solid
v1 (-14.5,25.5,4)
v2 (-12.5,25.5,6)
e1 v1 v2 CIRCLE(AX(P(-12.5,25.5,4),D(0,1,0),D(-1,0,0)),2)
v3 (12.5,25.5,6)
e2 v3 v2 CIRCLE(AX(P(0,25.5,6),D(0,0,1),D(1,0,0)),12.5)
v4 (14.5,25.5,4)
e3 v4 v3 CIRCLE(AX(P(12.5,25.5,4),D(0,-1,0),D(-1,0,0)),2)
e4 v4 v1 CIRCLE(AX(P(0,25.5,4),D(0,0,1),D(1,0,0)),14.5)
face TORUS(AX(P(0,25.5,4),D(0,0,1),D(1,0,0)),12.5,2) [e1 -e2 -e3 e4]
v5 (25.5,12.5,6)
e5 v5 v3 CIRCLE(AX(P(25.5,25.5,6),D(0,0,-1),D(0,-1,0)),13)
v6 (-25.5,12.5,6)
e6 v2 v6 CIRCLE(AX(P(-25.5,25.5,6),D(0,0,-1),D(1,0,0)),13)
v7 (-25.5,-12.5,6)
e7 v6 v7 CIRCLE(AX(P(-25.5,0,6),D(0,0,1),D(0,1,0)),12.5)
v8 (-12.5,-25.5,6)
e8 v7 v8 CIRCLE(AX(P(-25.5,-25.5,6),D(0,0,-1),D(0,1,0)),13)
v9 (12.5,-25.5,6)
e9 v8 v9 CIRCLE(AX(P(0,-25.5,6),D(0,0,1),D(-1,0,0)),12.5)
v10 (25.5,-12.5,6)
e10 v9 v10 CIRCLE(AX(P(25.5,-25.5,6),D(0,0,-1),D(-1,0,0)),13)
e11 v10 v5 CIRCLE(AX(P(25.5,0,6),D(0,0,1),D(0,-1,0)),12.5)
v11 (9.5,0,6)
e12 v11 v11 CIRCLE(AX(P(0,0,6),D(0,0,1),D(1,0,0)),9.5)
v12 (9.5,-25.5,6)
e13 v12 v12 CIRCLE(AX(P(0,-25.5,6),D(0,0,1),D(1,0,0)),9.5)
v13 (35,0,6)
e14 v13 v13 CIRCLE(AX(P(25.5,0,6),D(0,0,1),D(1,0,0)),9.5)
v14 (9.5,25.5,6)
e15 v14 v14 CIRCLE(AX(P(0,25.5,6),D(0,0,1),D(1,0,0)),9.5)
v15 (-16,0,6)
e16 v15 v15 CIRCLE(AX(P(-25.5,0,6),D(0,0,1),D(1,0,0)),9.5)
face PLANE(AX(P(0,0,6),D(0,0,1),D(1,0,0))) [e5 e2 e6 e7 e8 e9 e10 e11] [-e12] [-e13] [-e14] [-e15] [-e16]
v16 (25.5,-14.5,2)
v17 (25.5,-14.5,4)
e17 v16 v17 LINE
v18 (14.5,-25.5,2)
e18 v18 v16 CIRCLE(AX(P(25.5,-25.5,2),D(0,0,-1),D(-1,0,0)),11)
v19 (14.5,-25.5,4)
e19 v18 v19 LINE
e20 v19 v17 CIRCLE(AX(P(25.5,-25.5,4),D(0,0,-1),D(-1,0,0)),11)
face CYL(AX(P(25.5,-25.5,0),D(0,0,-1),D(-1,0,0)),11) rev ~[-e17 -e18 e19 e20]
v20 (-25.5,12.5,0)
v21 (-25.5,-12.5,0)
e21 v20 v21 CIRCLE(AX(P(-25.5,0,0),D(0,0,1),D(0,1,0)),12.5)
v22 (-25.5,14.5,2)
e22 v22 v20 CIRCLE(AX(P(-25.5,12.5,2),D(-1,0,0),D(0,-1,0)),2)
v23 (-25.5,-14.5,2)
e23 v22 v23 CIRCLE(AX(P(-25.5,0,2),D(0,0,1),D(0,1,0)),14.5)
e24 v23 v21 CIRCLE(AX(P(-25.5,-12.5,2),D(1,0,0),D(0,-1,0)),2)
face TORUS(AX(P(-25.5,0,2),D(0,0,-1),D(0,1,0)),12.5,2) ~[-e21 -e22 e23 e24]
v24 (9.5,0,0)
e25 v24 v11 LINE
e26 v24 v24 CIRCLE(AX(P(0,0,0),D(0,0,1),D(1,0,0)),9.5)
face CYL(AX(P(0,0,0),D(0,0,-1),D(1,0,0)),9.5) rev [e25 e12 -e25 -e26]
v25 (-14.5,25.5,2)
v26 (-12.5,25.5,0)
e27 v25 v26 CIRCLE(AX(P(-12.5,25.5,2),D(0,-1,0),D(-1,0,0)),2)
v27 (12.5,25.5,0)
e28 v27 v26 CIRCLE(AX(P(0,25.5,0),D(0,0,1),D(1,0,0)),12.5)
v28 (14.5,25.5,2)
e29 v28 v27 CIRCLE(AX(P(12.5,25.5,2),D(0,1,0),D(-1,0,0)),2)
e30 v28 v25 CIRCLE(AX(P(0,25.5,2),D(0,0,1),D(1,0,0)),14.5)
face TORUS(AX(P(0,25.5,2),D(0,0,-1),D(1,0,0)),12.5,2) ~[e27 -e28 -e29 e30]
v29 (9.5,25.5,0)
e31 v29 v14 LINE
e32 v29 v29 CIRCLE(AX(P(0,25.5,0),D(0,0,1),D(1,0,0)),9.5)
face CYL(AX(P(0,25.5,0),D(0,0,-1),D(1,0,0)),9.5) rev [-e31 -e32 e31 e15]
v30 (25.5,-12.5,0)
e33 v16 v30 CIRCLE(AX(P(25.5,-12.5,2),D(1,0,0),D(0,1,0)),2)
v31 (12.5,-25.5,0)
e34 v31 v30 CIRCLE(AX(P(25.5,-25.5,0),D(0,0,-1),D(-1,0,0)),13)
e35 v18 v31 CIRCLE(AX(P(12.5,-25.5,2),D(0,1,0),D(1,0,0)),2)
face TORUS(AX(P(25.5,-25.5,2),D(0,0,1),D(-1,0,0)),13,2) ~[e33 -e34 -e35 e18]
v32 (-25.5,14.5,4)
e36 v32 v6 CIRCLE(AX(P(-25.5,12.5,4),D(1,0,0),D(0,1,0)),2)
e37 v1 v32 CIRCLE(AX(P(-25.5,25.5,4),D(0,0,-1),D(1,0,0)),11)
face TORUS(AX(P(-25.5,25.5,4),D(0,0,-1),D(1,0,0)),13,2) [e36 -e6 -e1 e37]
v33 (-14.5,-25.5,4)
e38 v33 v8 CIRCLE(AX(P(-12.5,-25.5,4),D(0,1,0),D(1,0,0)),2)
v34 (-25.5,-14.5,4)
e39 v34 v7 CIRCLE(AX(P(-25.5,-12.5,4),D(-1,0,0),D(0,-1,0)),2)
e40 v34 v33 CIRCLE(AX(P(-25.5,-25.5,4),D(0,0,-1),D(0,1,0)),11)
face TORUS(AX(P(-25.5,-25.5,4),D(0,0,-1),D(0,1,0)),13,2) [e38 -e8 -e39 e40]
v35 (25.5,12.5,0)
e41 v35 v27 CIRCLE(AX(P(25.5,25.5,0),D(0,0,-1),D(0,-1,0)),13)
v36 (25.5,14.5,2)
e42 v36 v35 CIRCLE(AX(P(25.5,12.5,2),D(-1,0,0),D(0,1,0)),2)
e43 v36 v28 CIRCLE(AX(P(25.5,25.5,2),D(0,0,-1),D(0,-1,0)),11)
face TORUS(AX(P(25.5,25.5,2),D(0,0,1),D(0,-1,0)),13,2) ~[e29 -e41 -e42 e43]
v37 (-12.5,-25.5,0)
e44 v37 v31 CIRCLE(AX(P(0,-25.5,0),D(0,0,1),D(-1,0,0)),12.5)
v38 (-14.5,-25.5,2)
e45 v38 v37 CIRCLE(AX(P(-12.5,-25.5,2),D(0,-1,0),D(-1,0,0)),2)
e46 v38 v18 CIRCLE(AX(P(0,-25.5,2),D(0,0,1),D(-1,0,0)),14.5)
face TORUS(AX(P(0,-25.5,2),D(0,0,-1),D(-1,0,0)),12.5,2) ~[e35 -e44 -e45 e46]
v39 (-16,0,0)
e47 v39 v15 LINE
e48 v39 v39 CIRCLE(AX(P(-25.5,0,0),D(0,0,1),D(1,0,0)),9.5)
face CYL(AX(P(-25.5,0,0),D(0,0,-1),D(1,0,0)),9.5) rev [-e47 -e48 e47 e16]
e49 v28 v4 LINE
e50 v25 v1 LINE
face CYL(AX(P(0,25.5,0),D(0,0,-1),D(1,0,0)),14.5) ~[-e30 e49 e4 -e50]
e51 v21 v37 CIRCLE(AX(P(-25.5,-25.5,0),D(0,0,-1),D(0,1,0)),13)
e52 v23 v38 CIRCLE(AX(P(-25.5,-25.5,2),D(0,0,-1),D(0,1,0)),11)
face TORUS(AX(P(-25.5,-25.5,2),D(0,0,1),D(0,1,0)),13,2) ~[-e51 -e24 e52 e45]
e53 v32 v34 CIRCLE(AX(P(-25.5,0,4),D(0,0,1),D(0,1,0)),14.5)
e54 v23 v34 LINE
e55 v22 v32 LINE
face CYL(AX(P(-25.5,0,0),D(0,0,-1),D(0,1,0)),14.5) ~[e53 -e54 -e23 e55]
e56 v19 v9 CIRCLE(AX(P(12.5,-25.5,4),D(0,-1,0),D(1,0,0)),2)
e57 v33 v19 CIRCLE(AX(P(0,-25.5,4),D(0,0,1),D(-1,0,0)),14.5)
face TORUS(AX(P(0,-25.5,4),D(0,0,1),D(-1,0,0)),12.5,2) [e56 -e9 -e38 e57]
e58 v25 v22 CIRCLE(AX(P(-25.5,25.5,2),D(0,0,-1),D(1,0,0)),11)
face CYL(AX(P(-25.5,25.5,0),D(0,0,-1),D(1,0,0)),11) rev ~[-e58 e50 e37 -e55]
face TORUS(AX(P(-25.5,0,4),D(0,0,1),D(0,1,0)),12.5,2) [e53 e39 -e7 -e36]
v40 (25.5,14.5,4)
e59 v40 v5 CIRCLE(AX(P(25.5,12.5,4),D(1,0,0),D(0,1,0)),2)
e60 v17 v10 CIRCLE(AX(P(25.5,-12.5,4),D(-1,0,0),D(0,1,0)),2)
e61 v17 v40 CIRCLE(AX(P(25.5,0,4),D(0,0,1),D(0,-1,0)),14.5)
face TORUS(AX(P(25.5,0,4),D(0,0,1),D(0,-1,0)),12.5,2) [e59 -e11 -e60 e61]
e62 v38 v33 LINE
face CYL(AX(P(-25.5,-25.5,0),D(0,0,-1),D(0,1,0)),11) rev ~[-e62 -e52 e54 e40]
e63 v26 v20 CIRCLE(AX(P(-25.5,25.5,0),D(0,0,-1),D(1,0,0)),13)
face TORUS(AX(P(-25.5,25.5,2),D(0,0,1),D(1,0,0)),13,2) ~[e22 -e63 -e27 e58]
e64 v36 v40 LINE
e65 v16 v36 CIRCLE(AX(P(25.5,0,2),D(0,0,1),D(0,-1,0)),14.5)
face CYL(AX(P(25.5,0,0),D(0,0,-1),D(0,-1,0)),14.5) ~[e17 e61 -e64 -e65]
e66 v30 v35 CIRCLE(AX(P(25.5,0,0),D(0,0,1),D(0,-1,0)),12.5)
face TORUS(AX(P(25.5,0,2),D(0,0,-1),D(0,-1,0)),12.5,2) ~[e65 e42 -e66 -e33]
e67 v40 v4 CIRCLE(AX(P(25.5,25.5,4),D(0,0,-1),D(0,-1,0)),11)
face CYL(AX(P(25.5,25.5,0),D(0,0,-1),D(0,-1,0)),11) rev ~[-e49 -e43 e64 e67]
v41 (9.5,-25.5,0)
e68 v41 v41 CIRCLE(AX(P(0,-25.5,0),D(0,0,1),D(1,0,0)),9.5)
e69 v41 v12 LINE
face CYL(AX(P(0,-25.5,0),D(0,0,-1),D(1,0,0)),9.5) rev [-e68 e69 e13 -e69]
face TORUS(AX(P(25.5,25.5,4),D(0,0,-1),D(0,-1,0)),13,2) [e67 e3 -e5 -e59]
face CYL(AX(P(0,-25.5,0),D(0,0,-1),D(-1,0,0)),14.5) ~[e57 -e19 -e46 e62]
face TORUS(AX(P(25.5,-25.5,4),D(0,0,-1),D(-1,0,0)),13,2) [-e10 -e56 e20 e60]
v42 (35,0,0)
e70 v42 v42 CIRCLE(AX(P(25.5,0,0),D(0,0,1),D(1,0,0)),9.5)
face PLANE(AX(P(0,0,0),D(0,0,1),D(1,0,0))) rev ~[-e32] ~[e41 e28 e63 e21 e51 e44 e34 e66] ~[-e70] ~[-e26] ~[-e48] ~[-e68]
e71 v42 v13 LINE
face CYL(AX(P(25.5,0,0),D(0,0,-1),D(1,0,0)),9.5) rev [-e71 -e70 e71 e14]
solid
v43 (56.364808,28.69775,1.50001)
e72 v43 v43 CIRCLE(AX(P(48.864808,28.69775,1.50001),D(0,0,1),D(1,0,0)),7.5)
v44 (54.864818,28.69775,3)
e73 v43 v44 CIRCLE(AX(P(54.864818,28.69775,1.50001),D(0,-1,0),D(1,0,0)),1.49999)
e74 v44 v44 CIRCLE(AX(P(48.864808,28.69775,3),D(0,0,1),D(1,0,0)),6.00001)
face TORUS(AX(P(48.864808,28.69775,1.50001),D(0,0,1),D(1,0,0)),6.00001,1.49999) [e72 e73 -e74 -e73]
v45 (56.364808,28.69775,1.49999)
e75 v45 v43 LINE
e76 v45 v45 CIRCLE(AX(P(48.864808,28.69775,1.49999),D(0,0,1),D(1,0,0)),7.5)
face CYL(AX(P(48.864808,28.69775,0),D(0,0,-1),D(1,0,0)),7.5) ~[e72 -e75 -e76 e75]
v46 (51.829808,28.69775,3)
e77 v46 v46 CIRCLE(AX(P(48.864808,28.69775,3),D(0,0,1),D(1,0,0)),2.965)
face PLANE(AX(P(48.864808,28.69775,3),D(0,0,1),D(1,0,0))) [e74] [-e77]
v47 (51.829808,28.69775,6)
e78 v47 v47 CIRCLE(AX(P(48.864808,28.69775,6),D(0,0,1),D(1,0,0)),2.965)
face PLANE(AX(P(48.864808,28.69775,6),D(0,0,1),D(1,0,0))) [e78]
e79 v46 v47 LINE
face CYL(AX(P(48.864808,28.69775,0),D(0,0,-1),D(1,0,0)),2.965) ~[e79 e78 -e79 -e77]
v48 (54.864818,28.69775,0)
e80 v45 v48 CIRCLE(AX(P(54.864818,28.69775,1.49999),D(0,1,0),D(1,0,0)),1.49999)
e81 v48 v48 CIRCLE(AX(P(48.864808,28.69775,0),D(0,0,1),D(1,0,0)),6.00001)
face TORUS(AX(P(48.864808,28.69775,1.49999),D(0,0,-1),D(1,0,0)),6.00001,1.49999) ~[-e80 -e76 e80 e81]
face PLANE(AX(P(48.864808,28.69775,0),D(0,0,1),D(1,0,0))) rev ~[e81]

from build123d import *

# Parameters (mm, degrees)
F0_R     = 9.5
F1_DEPTH = 6
F2_R     = 2
F3_R     = 2.965
F4_DEPTH = 6
F3_R_2   = 7.5
F5_DEPTH = 3
F6_R     = 1.49999


# Not quite as in the source:
# - a fillet or chamfer is up to 0.001 mm smaller than in the source, because OpenCascade refuses the exact size


with BuildPart() as f1:
    # F0 (on Top) → F1 (new body)
    with BuildSketch(Plane.XY):
        with BuildLine():
            ThreePointArc((25.5, 14.5), (17.7218254069, 17.7218254069), (14.5, 25.5))
            ThreePointArc((14.5, 25.5), (0, 40), (-14.5, 25.5))
            ThreePointArc((-14.5, 25.5), (-17.7218254069, 17.7218254069), (-25.5, 14.5))
            ThreePointArc((-25.5, 14.5), (-40, 0), (-25.5, -14.5))
            ThreePointArc((-25.5, -14.5), (-17.7218254069, -17.7218254069), (-14.5, -25.5))
            ThreePointArc((-14.5, -25.5), (0, -40), (14.5, -25.5))
            ThreePointArc((14.5, -25.5), (17.7218254069, -17.7218254069), (25.5, -14.5))
            ThreePointArc((25.5, -14.5), (40, 0), (25.5, 14.5))
        make_face()
        with Locations((0, -25.5)):
            Circle(F0_R, mode=Mode.SUBTRACT)
        with Locations((-25.5, 0)):
            Circle(F0_R, mode=Mode.SUBTRACT)
        Circle(F0_R, mode=Mode.SUBTRACT)
        with Locations((25.5, 0)):
            Circle(F0_R, mode=Mode.SUBTRACT)
        with Locations((0, 25.5)):
            Circle(F0_R, mode=Mode.SUBTRACT)
    extrude(amount=F1_DEPTH)

    # F2
    f2_edges = [f1.edges().sort_by_distance(p)[0] for p in [
        (-40, 0, 6),
        (-17.721825, -17.721825, 6),
        (0, -40, 6),
        (17.721825, -17.721825, 6),
        (40, 0, 6),
        (17.721825, 17.721825, 6),
        (0, -40, 0),
        (-17.721825, -17.721825, 0),
        (-40, 0, 0),
        (17.721825, -17.721825, 0),
        (40, 0, 0),
        (17.721825, 17.721825, 0),
        (0, 40, 0),
        (0, 40, 6),
        (-17.721825, 17.721825, 6),
        (-17.721825, 17.721825, 0),
    ]]
    fillet(f2_edges, radius=F2_R)


with BuildPart() as f4:
    # F3 (on Top) → F4 (new body)
    with BuildSketch(Plane.XY):
        with Locations((48.8648079336, 28.6977495998)):
            Circle(F3_R)
    extrude(amount=F4_DEPTH)

    # F3 (on Top) → F5 (join)
    with BuildSketch(Plane.XY):
        with Locations((48.8648079336, 28.6977495998)):
            Circle(F3_R_2)
        with Locations((48.8648079336, 28.6977495998)):
            Circle(F3_R, mode=Mode.SUBTRACT)
    extrude(amount=F5_DEPTH)

    # F6 (radius 1.5 in the source; OpenCascade refuses exactly that, so slightly less here)
    f6_edges = [f4.edges().sort_by_distance(p)[0] for p in [
        (41.364808, 28.69775, 3),
        (41.364808, 28.69775, 0),
    ]]
    fillet(f6_edges, radius=F6_R)


solid = Compound([f1.part, f4.part])
